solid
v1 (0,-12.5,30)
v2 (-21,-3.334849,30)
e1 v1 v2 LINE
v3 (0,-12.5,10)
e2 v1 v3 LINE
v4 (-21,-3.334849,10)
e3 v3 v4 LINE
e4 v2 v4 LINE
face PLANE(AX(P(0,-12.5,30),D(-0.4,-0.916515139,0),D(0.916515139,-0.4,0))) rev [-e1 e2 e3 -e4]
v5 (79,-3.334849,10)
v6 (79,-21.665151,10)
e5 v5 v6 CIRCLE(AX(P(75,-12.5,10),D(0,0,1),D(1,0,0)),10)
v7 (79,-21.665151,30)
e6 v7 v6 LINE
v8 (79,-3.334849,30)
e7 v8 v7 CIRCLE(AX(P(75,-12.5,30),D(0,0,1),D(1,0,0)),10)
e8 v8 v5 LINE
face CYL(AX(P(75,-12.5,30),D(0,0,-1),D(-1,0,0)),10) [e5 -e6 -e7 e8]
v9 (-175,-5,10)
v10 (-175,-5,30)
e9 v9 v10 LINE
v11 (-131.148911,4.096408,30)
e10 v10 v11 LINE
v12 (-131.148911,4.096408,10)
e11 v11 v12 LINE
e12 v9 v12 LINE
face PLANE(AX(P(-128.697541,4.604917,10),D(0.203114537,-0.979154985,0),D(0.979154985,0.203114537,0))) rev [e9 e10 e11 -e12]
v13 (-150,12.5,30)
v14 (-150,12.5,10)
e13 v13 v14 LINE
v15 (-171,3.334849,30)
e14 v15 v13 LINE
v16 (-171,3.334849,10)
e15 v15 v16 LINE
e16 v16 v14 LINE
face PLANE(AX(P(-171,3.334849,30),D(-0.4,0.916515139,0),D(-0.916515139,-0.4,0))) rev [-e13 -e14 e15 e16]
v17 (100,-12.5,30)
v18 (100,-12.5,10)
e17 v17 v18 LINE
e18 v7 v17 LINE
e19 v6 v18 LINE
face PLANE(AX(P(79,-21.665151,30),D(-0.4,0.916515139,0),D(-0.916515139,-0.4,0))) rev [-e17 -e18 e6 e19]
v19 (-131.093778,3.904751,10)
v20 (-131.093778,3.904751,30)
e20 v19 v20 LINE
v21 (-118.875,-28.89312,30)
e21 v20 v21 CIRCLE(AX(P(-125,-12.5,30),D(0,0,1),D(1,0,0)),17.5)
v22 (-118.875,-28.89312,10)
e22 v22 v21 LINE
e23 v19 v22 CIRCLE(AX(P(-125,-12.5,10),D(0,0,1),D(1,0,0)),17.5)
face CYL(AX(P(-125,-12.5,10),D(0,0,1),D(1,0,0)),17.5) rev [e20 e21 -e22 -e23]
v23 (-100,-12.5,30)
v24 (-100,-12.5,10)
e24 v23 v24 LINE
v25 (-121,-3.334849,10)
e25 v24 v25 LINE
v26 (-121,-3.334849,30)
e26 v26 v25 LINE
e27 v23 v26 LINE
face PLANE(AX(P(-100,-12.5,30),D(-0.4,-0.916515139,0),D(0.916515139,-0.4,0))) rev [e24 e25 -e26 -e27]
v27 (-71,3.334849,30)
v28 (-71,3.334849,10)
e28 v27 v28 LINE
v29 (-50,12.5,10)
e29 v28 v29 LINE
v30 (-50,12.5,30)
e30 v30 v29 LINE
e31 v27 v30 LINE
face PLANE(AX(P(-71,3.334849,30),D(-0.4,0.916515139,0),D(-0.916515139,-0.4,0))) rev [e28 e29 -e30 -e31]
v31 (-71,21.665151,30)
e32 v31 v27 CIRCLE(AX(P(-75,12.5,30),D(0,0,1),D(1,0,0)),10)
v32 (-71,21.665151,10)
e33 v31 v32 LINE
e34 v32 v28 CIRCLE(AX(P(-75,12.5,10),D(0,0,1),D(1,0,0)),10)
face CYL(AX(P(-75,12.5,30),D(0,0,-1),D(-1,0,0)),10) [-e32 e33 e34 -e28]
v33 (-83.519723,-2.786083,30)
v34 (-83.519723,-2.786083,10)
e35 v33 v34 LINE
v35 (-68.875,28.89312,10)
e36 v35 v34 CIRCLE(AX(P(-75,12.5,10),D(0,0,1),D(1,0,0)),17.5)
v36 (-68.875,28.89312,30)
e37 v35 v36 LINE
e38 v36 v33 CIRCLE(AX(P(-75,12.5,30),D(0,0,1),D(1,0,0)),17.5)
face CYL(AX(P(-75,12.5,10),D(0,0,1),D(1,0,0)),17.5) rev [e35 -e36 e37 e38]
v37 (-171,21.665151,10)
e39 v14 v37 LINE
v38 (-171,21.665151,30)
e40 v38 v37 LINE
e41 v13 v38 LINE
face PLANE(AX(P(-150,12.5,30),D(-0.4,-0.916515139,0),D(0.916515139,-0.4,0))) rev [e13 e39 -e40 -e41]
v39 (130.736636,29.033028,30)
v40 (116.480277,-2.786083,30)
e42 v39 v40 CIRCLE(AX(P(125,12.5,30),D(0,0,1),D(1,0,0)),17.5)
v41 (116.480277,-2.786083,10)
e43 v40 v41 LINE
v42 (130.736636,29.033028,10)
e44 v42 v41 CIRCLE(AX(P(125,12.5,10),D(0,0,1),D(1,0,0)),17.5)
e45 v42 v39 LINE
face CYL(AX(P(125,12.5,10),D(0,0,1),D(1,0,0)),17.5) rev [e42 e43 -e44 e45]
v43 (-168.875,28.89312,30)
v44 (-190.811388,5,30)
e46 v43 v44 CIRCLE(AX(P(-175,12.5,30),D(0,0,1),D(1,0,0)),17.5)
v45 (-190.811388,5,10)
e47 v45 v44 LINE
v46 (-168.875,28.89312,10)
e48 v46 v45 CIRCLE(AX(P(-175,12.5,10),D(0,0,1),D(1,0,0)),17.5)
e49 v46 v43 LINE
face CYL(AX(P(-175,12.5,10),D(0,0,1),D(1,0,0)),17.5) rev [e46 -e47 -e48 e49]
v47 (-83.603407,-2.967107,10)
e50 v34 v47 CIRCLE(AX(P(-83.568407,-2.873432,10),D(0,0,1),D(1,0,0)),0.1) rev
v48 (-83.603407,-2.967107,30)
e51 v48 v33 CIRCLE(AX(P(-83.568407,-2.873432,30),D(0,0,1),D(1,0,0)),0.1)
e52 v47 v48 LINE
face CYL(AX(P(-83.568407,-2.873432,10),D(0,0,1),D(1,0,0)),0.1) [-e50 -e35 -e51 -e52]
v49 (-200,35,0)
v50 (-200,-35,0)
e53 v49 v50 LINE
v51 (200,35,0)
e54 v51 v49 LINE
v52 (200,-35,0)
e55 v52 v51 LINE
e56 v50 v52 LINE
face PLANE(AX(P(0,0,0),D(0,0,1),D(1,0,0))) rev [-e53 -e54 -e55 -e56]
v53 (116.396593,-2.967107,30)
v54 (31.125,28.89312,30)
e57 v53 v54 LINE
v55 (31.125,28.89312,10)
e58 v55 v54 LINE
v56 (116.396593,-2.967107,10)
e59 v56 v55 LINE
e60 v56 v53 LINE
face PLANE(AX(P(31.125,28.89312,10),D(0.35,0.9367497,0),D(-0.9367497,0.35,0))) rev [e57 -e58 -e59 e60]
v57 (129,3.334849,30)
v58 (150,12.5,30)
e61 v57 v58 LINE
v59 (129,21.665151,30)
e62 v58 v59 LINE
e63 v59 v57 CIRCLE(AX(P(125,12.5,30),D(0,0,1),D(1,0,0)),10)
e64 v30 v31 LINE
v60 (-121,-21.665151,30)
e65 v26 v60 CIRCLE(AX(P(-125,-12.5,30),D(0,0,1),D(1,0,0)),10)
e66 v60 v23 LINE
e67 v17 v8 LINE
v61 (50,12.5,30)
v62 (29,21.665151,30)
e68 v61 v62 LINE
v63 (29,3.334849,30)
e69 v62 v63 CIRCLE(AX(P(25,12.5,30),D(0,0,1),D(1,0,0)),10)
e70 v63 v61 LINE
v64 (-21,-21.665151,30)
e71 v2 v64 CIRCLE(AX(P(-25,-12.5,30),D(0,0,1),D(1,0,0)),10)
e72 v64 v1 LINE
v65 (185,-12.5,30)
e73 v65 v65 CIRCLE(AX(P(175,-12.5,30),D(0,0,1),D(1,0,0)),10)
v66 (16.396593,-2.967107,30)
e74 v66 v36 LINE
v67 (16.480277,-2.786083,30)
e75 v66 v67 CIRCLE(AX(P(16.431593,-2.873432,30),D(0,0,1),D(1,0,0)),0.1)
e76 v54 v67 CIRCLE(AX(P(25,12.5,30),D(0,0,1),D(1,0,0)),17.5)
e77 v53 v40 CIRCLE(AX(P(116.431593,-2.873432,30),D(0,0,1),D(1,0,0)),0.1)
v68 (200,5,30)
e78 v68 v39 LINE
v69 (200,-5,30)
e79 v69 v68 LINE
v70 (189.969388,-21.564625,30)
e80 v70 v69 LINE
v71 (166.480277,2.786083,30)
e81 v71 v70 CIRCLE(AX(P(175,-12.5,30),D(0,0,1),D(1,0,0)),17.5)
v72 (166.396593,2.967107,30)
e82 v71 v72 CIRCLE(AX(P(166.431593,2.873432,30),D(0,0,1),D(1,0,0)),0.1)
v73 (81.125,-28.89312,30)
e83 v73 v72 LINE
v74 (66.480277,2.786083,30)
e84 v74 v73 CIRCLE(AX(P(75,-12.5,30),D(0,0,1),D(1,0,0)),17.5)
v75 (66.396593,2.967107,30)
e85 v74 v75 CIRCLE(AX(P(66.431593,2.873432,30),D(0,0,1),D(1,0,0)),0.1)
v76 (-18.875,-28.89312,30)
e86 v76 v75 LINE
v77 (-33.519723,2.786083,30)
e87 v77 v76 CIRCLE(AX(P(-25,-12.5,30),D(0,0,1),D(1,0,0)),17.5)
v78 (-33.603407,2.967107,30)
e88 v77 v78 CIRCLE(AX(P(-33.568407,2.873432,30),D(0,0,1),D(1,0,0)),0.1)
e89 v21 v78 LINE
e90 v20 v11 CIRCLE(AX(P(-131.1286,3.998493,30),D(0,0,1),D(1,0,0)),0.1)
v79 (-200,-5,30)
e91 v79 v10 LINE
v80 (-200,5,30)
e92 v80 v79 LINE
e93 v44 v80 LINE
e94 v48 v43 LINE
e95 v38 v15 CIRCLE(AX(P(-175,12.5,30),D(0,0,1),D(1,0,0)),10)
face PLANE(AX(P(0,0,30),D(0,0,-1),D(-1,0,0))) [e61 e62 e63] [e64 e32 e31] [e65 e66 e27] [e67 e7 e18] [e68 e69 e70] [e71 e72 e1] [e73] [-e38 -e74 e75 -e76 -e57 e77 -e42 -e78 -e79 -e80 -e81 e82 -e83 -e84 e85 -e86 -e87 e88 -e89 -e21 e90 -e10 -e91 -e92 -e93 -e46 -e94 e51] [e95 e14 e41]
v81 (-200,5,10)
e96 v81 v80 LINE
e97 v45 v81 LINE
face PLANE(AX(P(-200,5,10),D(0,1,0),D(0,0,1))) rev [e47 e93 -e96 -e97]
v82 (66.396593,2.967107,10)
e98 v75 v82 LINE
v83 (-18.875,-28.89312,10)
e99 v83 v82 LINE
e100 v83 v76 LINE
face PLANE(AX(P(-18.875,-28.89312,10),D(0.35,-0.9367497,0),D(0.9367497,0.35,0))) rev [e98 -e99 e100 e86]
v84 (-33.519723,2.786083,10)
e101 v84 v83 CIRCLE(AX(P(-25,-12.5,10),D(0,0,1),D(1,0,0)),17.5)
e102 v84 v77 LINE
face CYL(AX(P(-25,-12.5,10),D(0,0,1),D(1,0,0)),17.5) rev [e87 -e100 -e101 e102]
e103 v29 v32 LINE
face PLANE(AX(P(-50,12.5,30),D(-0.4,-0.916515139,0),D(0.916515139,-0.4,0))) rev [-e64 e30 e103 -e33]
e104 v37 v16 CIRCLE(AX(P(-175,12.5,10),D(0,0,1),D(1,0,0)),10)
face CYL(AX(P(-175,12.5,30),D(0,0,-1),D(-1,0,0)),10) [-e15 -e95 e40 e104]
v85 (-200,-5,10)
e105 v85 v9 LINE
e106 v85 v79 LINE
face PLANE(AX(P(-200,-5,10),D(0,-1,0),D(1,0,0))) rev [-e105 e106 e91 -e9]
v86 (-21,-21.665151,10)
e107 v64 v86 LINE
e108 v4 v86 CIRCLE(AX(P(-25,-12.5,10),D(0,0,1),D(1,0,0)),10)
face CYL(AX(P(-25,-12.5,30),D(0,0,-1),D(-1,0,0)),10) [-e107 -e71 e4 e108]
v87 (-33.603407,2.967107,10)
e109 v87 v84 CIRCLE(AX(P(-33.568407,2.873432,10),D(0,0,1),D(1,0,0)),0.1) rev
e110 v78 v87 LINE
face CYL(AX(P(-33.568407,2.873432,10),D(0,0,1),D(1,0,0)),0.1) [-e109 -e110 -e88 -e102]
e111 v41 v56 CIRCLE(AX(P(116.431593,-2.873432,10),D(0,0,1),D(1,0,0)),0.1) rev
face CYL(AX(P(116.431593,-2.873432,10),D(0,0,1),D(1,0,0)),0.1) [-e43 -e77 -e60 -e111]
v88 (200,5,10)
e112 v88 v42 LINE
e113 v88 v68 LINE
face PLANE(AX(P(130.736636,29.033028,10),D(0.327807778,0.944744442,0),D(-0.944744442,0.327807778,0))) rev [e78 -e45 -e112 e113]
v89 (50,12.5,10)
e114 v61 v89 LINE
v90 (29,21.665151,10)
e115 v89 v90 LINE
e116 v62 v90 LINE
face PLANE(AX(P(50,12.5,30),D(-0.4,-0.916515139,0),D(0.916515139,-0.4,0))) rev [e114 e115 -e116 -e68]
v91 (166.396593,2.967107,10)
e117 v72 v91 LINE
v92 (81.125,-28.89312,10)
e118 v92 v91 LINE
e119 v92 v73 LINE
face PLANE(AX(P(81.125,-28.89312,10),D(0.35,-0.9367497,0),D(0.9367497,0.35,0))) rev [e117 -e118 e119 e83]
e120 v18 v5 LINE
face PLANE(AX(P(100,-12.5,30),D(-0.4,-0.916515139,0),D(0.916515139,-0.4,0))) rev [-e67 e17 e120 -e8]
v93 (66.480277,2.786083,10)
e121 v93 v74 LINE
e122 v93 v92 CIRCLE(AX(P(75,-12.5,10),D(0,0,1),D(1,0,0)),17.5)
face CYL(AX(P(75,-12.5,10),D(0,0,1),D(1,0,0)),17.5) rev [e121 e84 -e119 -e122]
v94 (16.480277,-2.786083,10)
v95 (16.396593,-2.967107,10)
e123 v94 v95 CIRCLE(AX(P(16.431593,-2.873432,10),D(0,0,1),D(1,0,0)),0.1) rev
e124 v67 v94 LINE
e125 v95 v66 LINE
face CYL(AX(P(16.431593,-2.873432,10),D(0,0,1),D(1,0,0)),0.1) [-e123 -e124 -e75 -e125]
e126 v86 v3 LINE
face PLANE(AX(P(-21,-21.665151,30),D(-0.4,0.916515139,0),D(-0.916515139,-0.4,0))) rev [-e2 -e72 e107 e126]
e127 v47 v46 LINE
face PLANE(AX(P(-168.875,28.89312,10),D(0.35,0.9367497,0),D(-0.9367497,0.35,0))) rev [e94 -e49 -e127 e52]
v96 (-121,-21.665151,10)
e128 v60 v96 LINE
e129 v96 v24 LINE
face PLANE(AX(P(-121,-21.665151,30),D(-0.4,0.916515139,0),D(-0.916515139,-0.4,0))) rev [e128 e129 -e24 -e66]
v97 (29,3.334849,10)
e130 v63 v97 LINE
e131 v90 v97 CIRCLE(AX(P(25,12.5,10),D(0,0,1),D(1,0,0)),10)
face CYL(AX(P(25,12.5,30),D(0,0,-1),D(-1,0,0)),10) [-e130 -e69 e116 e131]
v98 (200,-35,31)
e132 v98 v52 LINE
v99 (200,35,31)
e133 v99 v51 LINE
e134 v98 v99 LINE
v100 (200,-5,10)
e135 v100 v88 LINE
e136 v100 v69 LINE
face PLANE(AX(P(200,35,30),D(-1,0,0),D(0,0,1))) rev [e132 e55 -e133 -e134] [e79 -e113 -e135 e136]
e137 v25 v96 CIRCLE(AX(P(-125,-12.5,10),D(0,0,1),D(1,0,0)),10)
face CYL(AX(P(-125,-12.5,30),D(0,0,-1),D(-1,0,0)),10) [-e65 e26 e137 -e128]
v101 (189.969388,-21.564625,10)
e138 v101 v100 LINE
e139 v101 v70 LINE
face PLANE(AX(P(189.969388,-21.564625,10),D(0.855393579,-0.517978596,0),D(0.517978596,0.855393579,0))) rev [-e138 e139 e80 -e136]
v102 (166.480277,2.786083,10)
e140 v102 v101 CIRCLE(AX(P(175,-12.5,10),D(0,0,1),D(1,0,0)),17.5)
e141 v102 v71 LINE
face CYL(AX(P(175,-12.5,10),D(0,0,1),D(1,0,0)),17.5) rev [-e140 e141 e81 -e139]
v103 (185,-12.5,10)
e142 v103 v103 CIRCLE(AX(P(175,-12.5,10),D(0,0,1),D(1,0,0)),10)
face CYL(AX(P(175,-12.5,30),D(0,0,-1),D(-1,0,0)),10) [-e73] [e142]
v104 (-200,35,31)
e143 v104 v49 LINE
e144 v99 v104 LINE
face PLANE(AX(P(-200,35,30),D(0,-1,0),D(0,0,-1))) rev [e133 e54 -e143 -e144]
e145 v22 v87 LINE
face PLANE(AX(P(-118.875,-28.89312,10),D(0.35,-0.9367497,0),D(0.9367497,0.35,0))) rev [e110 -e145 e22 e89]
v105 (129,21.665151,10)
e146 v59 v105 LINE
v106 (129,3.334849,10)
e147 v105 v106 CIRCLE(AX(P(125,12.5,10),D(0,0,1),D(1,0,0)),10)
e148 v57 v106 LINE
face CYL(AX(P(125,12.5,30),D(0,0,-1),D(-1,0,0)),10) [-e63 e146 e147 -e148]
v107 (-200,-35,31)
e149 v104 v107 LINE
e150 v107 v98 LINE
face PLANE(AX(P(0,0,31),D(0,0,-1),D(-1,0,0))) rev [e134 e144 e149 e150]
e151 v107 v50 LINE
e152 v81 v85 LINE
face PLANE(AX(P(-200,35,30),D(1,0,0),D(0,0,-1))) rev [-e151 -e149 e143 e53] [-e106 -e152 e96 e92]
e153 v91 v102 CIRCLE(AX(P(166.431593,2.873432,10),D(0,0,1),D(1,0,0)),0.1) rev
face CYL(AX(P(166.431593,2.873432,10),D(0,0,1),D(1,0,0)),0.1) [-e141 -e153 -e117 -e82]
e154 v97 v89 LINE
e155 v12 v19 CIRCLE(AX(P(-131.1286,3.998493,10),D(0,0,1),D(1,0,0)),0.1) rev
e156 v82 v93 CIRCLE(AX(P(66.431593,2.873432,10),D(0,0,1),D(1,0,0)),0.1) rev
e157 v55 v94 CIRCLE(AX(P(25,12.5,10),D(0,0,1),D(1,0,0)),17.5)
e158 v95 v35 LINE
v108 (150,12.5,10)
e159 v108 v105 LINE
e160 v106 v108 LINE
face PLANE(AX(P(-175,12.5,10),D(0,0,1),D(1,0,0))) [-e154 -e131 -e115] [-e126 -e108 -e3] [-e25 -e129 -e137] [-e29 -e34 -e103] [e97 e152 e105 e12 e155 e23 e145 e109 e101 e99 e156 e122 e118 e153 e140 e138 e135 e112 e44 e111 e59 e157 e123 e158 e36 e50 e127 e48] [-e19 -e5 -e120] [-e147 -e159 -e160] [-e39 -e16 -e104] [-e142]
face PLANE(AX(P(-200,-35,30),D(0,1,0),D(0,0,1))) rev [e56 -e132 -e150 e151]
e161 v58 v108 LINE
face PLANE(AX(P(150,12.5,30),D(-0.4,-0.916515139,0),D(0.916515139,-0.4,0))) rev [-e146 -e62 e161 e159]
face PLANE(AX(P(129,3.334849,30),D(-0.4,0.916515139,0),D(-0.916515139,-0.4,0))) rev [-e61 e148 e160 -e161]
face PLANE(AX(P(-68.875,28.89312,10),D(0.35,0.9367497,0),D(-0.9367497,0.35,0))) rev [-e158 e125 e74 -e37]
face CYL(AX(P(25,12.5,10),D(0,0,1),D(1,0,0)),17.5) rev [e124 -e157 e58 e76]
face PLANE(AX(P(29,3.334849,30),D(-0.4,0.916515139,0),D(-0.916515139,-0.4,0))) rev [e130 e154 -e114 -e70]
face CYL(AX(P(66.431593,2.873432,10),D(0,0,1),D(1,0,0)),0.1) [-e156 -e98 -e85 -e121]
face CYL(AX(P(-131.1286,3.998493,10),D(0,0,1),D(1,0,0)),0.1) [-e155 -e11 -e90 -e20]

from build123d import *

# Parameters (mm, degrees)
SKETCH1_W           = 400
SKETCH1_H           = 70
BOSS_EXTRUDE1_DEPTH = 30
CUT_EXTRUDE1_DEPTH  = 20
FILLET1_R           = 0.1
FILLET2_START       = 10
FILLET2_DEPTH       = 21
BOSS_EXTRUDE2_DEPTH = 20
LPATTERN1_COUNT     = 4
LPATTERN1_PITCH     = 100
BOSS_EXTRUDE3_DEPTH = 20
LPATTERN2_COUNT     = 3
LPATTERN2_PITCH     = 100
SKETCH5_R           = 10
BOSS_EXTRUDE4_DEPTH = 20
SKETCH6_W           = 400
SKETCH6_H           = 70
BOSS_EXTRUDE5_DEPTH = 1


with BuildPart() as part:
    # Sketch1 → Boss-Extrude1 (new body)
    with BuildSketch(Plane.XY):
        Rectangle(SKETCH1_W, SKETCH1_H)
    extrude(amount=BOSS_EXTRUDE1_DEPTH)

    # Sketch2 → Cut-Extrude1 (cut)
    with BuildSketch(Plane.XY.offset(30)):
        with BuildLine():
            Line((-128.697541479, 4.604917042), (-175, -5))
            Line((-175, -5), (-200, -5))
            Line((-200, -5), (-200, 5))
            Line((-200, 5), (-190.811388301, 5))
            ThreePointArc((-190.811388301, 5), (-187.890958939, 24.335251481), (-168.875, 28.893119746))
            Line((-168.875, 28.893119746), (-81.125, -3.893119746))
            ThreePointArc((-81.125, -3.893119746), (-91.393119746, 18.625), (-68.875, 28.893119746))
            Line((-68.875, 28.893119746), (18.875, -3.893119746))
            ThreePointArc((18.875, -3.893119746), (8.606880254, 18.625), (31.125, 28.893119746))
            Line((31.125, 28.893119746), (118.875, -3.893119746))
            ThreePointArc((118.875, -3.893119746), (108.53578111, 18.431230593), (130.736636107, 29.033027738))
            Line((130.736636107, 29.033027738), (200, 5))
            Line((200, 5), (200, -5))
            Line((200, -5), (189.969387627, -21.564625424))
            ThreePointArc((189.969387627, -21.564625424), (161.524837834, -23.665572292), (168.875, 3.893119746))
            Line((168.875, 3.893119746), (81.125, -28.893119746))
            ThreePointArc((81.125, -28.893119746), (58.606880254, -18.625), (68.875, 3.893119746))
            Line((68.875, 3.893119746), (-18.875, -28.893119746))
            ThreePointArc((-18.875, -28.893119746), (-41.393119746, -18.625), (-31.125, 3.893119746))
            Line((-31.125, 3.893119746), (-118.875, -28.893119746))
            ThreePointArc((-118.875, -28.893119746), (-141.792937679, -17.424149076), (-128.697541479, 4.604917042))
        make_face()
    extrude(amount=-CUT_EXTRUDE1_DEPTH, mode=Mode.SUBTRACT)

    # Fillet1
    fillet1_edges = [part.edges().sort_by_distance(p)[0] for p in [
        (-128.697541479, 4.604917042, 20),
    ]]
    fillet(fillet1_edges, radius=FILLET1_R)

    # Fillet2: read off the stored shape, not the designer's step
    # Fillet2 outline → Fillet2 (cut)
    with BuildSketch(Plane.XY.offset(FILLET2_START)):
        with BuildLine():
            ThreePointArc((-33.603406746, 2.967106787), (-33.477636502, 2.91539326), (-33.519722617, 2.786082773))
            ThreePointArc((-33.519722617, 2.786082773), (-32.343252539, 3.384792796), (-31.125, 3.893119746))
            Line((-31.125, 3.893119746), (-33.603406746, 2.967106787))
        make_face()
        with BuildLine():
            ThreePointArc((66.396593254, 2.967106787), (66.522363498, 2.91539326), (66.480277383, 2.786082773))
            ThreePointArc((66.480277383, 2.786082773), (67.656747461, 3.384792796), (68.875, 3.893119746))
            Line((68.875, 3.893119746), (66.396593254, 2.967106787))
        make_face()
        with BuildLine():
            ThreePointArc((166.396593254, 2.967106787), (166.522363498, 2.91539326), (166.480277383, 2.786082773))
            ThreePointArc((166.480277383, 2.786082773), (167.656747461, 3.384792796), (168.875, 3.893119746))
            Line((168.875, 3.893119746), (166.396593254, 2.967106787))
        make_face()
        with BuildLine():
            ThreePointArc((116.480277383, -2.786082773), (116.522363498, -2.91539326), (116.396593254, -2.967106787))
            Line((116.396593254, -2.967106787), (118.875, -3.893119746))
            ThreePointArc((118.875, -3.893119746), (117.656747461, -3.384792796), (116.480277383, -2.786082773))
        make_face()
        with BuildLine():
            ThreePointArc((-81.125, -3.893119746), (-82.343252539, -3.384792796), (-83.519722617, -2.786082773))
            ThreePointArc((-83.519722617, -2.786082773), (-83.477636502, -2.91539326), (-83.603406746, -2.967106787))
            Line((-83.603406746, -2.967106787), (-81.125, -3.893119746))
        make_face()
        with BuildLine():
            ThreePointArc((16.480277383, -2.786082773), (16.522363498, -2.91539326), (16.396593254, -2.967106787))
            Line((16.396593254, -2.967106787), (18.875, -3.893119746))
            ThreePointArc((18.875, -3.893119746), (17.656747461, -3.384792796), (16.480277383, -2.786082773))
        make_face()
    extrude(amount=FILLET2_DEPTH, mode=Mode.SUBTRACT)

    # Sketch3 → Boss-Extrude2 (add)
    with BuildSketch(Plane.XY.offset(10)):
        with BuildLine():
            Line((-171, 3.33484861), (-150, 12.5))
            Line((-150, 12.5), (-171, 21.66515139))
            ThreePointArc((-171, 21.66515139), (-185, 12.5), (-171, 3.33484861))
        make_face()
    boss_extrude2 = extrude(amount=BOSS_EXTRUDE2_DEPTH)

    # LPattern1: Boss-Extrude2 ×4
    with Locations(*[(i * LPATTERN1_PITCH, 0, 0) for i in range(1, LPATTERN1_COUNT)]):
        add(boss_extrude2)

    # Sketch4 → Boss-Extrude3 (add)
    with BuildSketch(Plane.XY.offset(10)):
        with BuildLine():
            Line((-121, -21.66515139), (-100, -12.5))
            Line((-100, -12.5), (-121, -3.33484861))
            ThreePointArc((-121, -3.33484861), (-135, -12.5), (-121, -21.66515139))
        make_face()
    boss_extrude3 = extrude(amount=BOSS_EXTRUDE3_DEPTH)

    # LPattern2: Boss-Extrude3 ×3
    with Locations(*[(i * LPATTERN2_PITCH, 0, 0) for i in range(1, LPATTERN2_COUNT)]):
        add(boss_extrude3)

    # Sketch5 → Boss-Extrude4 (add)
    with BuildSketch(Plane.XY.offset(10)):
        with Locations((175, -12.5)):
            Circle(SKETCH5_R)
    extrude(amount=BOSS_EXTRUDE4_DEPTH)

    # Sketch6 → Boss-Extrude5 (add)
    with BuildSketch(Plane.XY.offset(30)):
        Rectangle(SKETCH6_W, SKETCH6_H)
    extrude(amount=BOSS_EXTRUDE5_DEPTH)


solid = part.part
